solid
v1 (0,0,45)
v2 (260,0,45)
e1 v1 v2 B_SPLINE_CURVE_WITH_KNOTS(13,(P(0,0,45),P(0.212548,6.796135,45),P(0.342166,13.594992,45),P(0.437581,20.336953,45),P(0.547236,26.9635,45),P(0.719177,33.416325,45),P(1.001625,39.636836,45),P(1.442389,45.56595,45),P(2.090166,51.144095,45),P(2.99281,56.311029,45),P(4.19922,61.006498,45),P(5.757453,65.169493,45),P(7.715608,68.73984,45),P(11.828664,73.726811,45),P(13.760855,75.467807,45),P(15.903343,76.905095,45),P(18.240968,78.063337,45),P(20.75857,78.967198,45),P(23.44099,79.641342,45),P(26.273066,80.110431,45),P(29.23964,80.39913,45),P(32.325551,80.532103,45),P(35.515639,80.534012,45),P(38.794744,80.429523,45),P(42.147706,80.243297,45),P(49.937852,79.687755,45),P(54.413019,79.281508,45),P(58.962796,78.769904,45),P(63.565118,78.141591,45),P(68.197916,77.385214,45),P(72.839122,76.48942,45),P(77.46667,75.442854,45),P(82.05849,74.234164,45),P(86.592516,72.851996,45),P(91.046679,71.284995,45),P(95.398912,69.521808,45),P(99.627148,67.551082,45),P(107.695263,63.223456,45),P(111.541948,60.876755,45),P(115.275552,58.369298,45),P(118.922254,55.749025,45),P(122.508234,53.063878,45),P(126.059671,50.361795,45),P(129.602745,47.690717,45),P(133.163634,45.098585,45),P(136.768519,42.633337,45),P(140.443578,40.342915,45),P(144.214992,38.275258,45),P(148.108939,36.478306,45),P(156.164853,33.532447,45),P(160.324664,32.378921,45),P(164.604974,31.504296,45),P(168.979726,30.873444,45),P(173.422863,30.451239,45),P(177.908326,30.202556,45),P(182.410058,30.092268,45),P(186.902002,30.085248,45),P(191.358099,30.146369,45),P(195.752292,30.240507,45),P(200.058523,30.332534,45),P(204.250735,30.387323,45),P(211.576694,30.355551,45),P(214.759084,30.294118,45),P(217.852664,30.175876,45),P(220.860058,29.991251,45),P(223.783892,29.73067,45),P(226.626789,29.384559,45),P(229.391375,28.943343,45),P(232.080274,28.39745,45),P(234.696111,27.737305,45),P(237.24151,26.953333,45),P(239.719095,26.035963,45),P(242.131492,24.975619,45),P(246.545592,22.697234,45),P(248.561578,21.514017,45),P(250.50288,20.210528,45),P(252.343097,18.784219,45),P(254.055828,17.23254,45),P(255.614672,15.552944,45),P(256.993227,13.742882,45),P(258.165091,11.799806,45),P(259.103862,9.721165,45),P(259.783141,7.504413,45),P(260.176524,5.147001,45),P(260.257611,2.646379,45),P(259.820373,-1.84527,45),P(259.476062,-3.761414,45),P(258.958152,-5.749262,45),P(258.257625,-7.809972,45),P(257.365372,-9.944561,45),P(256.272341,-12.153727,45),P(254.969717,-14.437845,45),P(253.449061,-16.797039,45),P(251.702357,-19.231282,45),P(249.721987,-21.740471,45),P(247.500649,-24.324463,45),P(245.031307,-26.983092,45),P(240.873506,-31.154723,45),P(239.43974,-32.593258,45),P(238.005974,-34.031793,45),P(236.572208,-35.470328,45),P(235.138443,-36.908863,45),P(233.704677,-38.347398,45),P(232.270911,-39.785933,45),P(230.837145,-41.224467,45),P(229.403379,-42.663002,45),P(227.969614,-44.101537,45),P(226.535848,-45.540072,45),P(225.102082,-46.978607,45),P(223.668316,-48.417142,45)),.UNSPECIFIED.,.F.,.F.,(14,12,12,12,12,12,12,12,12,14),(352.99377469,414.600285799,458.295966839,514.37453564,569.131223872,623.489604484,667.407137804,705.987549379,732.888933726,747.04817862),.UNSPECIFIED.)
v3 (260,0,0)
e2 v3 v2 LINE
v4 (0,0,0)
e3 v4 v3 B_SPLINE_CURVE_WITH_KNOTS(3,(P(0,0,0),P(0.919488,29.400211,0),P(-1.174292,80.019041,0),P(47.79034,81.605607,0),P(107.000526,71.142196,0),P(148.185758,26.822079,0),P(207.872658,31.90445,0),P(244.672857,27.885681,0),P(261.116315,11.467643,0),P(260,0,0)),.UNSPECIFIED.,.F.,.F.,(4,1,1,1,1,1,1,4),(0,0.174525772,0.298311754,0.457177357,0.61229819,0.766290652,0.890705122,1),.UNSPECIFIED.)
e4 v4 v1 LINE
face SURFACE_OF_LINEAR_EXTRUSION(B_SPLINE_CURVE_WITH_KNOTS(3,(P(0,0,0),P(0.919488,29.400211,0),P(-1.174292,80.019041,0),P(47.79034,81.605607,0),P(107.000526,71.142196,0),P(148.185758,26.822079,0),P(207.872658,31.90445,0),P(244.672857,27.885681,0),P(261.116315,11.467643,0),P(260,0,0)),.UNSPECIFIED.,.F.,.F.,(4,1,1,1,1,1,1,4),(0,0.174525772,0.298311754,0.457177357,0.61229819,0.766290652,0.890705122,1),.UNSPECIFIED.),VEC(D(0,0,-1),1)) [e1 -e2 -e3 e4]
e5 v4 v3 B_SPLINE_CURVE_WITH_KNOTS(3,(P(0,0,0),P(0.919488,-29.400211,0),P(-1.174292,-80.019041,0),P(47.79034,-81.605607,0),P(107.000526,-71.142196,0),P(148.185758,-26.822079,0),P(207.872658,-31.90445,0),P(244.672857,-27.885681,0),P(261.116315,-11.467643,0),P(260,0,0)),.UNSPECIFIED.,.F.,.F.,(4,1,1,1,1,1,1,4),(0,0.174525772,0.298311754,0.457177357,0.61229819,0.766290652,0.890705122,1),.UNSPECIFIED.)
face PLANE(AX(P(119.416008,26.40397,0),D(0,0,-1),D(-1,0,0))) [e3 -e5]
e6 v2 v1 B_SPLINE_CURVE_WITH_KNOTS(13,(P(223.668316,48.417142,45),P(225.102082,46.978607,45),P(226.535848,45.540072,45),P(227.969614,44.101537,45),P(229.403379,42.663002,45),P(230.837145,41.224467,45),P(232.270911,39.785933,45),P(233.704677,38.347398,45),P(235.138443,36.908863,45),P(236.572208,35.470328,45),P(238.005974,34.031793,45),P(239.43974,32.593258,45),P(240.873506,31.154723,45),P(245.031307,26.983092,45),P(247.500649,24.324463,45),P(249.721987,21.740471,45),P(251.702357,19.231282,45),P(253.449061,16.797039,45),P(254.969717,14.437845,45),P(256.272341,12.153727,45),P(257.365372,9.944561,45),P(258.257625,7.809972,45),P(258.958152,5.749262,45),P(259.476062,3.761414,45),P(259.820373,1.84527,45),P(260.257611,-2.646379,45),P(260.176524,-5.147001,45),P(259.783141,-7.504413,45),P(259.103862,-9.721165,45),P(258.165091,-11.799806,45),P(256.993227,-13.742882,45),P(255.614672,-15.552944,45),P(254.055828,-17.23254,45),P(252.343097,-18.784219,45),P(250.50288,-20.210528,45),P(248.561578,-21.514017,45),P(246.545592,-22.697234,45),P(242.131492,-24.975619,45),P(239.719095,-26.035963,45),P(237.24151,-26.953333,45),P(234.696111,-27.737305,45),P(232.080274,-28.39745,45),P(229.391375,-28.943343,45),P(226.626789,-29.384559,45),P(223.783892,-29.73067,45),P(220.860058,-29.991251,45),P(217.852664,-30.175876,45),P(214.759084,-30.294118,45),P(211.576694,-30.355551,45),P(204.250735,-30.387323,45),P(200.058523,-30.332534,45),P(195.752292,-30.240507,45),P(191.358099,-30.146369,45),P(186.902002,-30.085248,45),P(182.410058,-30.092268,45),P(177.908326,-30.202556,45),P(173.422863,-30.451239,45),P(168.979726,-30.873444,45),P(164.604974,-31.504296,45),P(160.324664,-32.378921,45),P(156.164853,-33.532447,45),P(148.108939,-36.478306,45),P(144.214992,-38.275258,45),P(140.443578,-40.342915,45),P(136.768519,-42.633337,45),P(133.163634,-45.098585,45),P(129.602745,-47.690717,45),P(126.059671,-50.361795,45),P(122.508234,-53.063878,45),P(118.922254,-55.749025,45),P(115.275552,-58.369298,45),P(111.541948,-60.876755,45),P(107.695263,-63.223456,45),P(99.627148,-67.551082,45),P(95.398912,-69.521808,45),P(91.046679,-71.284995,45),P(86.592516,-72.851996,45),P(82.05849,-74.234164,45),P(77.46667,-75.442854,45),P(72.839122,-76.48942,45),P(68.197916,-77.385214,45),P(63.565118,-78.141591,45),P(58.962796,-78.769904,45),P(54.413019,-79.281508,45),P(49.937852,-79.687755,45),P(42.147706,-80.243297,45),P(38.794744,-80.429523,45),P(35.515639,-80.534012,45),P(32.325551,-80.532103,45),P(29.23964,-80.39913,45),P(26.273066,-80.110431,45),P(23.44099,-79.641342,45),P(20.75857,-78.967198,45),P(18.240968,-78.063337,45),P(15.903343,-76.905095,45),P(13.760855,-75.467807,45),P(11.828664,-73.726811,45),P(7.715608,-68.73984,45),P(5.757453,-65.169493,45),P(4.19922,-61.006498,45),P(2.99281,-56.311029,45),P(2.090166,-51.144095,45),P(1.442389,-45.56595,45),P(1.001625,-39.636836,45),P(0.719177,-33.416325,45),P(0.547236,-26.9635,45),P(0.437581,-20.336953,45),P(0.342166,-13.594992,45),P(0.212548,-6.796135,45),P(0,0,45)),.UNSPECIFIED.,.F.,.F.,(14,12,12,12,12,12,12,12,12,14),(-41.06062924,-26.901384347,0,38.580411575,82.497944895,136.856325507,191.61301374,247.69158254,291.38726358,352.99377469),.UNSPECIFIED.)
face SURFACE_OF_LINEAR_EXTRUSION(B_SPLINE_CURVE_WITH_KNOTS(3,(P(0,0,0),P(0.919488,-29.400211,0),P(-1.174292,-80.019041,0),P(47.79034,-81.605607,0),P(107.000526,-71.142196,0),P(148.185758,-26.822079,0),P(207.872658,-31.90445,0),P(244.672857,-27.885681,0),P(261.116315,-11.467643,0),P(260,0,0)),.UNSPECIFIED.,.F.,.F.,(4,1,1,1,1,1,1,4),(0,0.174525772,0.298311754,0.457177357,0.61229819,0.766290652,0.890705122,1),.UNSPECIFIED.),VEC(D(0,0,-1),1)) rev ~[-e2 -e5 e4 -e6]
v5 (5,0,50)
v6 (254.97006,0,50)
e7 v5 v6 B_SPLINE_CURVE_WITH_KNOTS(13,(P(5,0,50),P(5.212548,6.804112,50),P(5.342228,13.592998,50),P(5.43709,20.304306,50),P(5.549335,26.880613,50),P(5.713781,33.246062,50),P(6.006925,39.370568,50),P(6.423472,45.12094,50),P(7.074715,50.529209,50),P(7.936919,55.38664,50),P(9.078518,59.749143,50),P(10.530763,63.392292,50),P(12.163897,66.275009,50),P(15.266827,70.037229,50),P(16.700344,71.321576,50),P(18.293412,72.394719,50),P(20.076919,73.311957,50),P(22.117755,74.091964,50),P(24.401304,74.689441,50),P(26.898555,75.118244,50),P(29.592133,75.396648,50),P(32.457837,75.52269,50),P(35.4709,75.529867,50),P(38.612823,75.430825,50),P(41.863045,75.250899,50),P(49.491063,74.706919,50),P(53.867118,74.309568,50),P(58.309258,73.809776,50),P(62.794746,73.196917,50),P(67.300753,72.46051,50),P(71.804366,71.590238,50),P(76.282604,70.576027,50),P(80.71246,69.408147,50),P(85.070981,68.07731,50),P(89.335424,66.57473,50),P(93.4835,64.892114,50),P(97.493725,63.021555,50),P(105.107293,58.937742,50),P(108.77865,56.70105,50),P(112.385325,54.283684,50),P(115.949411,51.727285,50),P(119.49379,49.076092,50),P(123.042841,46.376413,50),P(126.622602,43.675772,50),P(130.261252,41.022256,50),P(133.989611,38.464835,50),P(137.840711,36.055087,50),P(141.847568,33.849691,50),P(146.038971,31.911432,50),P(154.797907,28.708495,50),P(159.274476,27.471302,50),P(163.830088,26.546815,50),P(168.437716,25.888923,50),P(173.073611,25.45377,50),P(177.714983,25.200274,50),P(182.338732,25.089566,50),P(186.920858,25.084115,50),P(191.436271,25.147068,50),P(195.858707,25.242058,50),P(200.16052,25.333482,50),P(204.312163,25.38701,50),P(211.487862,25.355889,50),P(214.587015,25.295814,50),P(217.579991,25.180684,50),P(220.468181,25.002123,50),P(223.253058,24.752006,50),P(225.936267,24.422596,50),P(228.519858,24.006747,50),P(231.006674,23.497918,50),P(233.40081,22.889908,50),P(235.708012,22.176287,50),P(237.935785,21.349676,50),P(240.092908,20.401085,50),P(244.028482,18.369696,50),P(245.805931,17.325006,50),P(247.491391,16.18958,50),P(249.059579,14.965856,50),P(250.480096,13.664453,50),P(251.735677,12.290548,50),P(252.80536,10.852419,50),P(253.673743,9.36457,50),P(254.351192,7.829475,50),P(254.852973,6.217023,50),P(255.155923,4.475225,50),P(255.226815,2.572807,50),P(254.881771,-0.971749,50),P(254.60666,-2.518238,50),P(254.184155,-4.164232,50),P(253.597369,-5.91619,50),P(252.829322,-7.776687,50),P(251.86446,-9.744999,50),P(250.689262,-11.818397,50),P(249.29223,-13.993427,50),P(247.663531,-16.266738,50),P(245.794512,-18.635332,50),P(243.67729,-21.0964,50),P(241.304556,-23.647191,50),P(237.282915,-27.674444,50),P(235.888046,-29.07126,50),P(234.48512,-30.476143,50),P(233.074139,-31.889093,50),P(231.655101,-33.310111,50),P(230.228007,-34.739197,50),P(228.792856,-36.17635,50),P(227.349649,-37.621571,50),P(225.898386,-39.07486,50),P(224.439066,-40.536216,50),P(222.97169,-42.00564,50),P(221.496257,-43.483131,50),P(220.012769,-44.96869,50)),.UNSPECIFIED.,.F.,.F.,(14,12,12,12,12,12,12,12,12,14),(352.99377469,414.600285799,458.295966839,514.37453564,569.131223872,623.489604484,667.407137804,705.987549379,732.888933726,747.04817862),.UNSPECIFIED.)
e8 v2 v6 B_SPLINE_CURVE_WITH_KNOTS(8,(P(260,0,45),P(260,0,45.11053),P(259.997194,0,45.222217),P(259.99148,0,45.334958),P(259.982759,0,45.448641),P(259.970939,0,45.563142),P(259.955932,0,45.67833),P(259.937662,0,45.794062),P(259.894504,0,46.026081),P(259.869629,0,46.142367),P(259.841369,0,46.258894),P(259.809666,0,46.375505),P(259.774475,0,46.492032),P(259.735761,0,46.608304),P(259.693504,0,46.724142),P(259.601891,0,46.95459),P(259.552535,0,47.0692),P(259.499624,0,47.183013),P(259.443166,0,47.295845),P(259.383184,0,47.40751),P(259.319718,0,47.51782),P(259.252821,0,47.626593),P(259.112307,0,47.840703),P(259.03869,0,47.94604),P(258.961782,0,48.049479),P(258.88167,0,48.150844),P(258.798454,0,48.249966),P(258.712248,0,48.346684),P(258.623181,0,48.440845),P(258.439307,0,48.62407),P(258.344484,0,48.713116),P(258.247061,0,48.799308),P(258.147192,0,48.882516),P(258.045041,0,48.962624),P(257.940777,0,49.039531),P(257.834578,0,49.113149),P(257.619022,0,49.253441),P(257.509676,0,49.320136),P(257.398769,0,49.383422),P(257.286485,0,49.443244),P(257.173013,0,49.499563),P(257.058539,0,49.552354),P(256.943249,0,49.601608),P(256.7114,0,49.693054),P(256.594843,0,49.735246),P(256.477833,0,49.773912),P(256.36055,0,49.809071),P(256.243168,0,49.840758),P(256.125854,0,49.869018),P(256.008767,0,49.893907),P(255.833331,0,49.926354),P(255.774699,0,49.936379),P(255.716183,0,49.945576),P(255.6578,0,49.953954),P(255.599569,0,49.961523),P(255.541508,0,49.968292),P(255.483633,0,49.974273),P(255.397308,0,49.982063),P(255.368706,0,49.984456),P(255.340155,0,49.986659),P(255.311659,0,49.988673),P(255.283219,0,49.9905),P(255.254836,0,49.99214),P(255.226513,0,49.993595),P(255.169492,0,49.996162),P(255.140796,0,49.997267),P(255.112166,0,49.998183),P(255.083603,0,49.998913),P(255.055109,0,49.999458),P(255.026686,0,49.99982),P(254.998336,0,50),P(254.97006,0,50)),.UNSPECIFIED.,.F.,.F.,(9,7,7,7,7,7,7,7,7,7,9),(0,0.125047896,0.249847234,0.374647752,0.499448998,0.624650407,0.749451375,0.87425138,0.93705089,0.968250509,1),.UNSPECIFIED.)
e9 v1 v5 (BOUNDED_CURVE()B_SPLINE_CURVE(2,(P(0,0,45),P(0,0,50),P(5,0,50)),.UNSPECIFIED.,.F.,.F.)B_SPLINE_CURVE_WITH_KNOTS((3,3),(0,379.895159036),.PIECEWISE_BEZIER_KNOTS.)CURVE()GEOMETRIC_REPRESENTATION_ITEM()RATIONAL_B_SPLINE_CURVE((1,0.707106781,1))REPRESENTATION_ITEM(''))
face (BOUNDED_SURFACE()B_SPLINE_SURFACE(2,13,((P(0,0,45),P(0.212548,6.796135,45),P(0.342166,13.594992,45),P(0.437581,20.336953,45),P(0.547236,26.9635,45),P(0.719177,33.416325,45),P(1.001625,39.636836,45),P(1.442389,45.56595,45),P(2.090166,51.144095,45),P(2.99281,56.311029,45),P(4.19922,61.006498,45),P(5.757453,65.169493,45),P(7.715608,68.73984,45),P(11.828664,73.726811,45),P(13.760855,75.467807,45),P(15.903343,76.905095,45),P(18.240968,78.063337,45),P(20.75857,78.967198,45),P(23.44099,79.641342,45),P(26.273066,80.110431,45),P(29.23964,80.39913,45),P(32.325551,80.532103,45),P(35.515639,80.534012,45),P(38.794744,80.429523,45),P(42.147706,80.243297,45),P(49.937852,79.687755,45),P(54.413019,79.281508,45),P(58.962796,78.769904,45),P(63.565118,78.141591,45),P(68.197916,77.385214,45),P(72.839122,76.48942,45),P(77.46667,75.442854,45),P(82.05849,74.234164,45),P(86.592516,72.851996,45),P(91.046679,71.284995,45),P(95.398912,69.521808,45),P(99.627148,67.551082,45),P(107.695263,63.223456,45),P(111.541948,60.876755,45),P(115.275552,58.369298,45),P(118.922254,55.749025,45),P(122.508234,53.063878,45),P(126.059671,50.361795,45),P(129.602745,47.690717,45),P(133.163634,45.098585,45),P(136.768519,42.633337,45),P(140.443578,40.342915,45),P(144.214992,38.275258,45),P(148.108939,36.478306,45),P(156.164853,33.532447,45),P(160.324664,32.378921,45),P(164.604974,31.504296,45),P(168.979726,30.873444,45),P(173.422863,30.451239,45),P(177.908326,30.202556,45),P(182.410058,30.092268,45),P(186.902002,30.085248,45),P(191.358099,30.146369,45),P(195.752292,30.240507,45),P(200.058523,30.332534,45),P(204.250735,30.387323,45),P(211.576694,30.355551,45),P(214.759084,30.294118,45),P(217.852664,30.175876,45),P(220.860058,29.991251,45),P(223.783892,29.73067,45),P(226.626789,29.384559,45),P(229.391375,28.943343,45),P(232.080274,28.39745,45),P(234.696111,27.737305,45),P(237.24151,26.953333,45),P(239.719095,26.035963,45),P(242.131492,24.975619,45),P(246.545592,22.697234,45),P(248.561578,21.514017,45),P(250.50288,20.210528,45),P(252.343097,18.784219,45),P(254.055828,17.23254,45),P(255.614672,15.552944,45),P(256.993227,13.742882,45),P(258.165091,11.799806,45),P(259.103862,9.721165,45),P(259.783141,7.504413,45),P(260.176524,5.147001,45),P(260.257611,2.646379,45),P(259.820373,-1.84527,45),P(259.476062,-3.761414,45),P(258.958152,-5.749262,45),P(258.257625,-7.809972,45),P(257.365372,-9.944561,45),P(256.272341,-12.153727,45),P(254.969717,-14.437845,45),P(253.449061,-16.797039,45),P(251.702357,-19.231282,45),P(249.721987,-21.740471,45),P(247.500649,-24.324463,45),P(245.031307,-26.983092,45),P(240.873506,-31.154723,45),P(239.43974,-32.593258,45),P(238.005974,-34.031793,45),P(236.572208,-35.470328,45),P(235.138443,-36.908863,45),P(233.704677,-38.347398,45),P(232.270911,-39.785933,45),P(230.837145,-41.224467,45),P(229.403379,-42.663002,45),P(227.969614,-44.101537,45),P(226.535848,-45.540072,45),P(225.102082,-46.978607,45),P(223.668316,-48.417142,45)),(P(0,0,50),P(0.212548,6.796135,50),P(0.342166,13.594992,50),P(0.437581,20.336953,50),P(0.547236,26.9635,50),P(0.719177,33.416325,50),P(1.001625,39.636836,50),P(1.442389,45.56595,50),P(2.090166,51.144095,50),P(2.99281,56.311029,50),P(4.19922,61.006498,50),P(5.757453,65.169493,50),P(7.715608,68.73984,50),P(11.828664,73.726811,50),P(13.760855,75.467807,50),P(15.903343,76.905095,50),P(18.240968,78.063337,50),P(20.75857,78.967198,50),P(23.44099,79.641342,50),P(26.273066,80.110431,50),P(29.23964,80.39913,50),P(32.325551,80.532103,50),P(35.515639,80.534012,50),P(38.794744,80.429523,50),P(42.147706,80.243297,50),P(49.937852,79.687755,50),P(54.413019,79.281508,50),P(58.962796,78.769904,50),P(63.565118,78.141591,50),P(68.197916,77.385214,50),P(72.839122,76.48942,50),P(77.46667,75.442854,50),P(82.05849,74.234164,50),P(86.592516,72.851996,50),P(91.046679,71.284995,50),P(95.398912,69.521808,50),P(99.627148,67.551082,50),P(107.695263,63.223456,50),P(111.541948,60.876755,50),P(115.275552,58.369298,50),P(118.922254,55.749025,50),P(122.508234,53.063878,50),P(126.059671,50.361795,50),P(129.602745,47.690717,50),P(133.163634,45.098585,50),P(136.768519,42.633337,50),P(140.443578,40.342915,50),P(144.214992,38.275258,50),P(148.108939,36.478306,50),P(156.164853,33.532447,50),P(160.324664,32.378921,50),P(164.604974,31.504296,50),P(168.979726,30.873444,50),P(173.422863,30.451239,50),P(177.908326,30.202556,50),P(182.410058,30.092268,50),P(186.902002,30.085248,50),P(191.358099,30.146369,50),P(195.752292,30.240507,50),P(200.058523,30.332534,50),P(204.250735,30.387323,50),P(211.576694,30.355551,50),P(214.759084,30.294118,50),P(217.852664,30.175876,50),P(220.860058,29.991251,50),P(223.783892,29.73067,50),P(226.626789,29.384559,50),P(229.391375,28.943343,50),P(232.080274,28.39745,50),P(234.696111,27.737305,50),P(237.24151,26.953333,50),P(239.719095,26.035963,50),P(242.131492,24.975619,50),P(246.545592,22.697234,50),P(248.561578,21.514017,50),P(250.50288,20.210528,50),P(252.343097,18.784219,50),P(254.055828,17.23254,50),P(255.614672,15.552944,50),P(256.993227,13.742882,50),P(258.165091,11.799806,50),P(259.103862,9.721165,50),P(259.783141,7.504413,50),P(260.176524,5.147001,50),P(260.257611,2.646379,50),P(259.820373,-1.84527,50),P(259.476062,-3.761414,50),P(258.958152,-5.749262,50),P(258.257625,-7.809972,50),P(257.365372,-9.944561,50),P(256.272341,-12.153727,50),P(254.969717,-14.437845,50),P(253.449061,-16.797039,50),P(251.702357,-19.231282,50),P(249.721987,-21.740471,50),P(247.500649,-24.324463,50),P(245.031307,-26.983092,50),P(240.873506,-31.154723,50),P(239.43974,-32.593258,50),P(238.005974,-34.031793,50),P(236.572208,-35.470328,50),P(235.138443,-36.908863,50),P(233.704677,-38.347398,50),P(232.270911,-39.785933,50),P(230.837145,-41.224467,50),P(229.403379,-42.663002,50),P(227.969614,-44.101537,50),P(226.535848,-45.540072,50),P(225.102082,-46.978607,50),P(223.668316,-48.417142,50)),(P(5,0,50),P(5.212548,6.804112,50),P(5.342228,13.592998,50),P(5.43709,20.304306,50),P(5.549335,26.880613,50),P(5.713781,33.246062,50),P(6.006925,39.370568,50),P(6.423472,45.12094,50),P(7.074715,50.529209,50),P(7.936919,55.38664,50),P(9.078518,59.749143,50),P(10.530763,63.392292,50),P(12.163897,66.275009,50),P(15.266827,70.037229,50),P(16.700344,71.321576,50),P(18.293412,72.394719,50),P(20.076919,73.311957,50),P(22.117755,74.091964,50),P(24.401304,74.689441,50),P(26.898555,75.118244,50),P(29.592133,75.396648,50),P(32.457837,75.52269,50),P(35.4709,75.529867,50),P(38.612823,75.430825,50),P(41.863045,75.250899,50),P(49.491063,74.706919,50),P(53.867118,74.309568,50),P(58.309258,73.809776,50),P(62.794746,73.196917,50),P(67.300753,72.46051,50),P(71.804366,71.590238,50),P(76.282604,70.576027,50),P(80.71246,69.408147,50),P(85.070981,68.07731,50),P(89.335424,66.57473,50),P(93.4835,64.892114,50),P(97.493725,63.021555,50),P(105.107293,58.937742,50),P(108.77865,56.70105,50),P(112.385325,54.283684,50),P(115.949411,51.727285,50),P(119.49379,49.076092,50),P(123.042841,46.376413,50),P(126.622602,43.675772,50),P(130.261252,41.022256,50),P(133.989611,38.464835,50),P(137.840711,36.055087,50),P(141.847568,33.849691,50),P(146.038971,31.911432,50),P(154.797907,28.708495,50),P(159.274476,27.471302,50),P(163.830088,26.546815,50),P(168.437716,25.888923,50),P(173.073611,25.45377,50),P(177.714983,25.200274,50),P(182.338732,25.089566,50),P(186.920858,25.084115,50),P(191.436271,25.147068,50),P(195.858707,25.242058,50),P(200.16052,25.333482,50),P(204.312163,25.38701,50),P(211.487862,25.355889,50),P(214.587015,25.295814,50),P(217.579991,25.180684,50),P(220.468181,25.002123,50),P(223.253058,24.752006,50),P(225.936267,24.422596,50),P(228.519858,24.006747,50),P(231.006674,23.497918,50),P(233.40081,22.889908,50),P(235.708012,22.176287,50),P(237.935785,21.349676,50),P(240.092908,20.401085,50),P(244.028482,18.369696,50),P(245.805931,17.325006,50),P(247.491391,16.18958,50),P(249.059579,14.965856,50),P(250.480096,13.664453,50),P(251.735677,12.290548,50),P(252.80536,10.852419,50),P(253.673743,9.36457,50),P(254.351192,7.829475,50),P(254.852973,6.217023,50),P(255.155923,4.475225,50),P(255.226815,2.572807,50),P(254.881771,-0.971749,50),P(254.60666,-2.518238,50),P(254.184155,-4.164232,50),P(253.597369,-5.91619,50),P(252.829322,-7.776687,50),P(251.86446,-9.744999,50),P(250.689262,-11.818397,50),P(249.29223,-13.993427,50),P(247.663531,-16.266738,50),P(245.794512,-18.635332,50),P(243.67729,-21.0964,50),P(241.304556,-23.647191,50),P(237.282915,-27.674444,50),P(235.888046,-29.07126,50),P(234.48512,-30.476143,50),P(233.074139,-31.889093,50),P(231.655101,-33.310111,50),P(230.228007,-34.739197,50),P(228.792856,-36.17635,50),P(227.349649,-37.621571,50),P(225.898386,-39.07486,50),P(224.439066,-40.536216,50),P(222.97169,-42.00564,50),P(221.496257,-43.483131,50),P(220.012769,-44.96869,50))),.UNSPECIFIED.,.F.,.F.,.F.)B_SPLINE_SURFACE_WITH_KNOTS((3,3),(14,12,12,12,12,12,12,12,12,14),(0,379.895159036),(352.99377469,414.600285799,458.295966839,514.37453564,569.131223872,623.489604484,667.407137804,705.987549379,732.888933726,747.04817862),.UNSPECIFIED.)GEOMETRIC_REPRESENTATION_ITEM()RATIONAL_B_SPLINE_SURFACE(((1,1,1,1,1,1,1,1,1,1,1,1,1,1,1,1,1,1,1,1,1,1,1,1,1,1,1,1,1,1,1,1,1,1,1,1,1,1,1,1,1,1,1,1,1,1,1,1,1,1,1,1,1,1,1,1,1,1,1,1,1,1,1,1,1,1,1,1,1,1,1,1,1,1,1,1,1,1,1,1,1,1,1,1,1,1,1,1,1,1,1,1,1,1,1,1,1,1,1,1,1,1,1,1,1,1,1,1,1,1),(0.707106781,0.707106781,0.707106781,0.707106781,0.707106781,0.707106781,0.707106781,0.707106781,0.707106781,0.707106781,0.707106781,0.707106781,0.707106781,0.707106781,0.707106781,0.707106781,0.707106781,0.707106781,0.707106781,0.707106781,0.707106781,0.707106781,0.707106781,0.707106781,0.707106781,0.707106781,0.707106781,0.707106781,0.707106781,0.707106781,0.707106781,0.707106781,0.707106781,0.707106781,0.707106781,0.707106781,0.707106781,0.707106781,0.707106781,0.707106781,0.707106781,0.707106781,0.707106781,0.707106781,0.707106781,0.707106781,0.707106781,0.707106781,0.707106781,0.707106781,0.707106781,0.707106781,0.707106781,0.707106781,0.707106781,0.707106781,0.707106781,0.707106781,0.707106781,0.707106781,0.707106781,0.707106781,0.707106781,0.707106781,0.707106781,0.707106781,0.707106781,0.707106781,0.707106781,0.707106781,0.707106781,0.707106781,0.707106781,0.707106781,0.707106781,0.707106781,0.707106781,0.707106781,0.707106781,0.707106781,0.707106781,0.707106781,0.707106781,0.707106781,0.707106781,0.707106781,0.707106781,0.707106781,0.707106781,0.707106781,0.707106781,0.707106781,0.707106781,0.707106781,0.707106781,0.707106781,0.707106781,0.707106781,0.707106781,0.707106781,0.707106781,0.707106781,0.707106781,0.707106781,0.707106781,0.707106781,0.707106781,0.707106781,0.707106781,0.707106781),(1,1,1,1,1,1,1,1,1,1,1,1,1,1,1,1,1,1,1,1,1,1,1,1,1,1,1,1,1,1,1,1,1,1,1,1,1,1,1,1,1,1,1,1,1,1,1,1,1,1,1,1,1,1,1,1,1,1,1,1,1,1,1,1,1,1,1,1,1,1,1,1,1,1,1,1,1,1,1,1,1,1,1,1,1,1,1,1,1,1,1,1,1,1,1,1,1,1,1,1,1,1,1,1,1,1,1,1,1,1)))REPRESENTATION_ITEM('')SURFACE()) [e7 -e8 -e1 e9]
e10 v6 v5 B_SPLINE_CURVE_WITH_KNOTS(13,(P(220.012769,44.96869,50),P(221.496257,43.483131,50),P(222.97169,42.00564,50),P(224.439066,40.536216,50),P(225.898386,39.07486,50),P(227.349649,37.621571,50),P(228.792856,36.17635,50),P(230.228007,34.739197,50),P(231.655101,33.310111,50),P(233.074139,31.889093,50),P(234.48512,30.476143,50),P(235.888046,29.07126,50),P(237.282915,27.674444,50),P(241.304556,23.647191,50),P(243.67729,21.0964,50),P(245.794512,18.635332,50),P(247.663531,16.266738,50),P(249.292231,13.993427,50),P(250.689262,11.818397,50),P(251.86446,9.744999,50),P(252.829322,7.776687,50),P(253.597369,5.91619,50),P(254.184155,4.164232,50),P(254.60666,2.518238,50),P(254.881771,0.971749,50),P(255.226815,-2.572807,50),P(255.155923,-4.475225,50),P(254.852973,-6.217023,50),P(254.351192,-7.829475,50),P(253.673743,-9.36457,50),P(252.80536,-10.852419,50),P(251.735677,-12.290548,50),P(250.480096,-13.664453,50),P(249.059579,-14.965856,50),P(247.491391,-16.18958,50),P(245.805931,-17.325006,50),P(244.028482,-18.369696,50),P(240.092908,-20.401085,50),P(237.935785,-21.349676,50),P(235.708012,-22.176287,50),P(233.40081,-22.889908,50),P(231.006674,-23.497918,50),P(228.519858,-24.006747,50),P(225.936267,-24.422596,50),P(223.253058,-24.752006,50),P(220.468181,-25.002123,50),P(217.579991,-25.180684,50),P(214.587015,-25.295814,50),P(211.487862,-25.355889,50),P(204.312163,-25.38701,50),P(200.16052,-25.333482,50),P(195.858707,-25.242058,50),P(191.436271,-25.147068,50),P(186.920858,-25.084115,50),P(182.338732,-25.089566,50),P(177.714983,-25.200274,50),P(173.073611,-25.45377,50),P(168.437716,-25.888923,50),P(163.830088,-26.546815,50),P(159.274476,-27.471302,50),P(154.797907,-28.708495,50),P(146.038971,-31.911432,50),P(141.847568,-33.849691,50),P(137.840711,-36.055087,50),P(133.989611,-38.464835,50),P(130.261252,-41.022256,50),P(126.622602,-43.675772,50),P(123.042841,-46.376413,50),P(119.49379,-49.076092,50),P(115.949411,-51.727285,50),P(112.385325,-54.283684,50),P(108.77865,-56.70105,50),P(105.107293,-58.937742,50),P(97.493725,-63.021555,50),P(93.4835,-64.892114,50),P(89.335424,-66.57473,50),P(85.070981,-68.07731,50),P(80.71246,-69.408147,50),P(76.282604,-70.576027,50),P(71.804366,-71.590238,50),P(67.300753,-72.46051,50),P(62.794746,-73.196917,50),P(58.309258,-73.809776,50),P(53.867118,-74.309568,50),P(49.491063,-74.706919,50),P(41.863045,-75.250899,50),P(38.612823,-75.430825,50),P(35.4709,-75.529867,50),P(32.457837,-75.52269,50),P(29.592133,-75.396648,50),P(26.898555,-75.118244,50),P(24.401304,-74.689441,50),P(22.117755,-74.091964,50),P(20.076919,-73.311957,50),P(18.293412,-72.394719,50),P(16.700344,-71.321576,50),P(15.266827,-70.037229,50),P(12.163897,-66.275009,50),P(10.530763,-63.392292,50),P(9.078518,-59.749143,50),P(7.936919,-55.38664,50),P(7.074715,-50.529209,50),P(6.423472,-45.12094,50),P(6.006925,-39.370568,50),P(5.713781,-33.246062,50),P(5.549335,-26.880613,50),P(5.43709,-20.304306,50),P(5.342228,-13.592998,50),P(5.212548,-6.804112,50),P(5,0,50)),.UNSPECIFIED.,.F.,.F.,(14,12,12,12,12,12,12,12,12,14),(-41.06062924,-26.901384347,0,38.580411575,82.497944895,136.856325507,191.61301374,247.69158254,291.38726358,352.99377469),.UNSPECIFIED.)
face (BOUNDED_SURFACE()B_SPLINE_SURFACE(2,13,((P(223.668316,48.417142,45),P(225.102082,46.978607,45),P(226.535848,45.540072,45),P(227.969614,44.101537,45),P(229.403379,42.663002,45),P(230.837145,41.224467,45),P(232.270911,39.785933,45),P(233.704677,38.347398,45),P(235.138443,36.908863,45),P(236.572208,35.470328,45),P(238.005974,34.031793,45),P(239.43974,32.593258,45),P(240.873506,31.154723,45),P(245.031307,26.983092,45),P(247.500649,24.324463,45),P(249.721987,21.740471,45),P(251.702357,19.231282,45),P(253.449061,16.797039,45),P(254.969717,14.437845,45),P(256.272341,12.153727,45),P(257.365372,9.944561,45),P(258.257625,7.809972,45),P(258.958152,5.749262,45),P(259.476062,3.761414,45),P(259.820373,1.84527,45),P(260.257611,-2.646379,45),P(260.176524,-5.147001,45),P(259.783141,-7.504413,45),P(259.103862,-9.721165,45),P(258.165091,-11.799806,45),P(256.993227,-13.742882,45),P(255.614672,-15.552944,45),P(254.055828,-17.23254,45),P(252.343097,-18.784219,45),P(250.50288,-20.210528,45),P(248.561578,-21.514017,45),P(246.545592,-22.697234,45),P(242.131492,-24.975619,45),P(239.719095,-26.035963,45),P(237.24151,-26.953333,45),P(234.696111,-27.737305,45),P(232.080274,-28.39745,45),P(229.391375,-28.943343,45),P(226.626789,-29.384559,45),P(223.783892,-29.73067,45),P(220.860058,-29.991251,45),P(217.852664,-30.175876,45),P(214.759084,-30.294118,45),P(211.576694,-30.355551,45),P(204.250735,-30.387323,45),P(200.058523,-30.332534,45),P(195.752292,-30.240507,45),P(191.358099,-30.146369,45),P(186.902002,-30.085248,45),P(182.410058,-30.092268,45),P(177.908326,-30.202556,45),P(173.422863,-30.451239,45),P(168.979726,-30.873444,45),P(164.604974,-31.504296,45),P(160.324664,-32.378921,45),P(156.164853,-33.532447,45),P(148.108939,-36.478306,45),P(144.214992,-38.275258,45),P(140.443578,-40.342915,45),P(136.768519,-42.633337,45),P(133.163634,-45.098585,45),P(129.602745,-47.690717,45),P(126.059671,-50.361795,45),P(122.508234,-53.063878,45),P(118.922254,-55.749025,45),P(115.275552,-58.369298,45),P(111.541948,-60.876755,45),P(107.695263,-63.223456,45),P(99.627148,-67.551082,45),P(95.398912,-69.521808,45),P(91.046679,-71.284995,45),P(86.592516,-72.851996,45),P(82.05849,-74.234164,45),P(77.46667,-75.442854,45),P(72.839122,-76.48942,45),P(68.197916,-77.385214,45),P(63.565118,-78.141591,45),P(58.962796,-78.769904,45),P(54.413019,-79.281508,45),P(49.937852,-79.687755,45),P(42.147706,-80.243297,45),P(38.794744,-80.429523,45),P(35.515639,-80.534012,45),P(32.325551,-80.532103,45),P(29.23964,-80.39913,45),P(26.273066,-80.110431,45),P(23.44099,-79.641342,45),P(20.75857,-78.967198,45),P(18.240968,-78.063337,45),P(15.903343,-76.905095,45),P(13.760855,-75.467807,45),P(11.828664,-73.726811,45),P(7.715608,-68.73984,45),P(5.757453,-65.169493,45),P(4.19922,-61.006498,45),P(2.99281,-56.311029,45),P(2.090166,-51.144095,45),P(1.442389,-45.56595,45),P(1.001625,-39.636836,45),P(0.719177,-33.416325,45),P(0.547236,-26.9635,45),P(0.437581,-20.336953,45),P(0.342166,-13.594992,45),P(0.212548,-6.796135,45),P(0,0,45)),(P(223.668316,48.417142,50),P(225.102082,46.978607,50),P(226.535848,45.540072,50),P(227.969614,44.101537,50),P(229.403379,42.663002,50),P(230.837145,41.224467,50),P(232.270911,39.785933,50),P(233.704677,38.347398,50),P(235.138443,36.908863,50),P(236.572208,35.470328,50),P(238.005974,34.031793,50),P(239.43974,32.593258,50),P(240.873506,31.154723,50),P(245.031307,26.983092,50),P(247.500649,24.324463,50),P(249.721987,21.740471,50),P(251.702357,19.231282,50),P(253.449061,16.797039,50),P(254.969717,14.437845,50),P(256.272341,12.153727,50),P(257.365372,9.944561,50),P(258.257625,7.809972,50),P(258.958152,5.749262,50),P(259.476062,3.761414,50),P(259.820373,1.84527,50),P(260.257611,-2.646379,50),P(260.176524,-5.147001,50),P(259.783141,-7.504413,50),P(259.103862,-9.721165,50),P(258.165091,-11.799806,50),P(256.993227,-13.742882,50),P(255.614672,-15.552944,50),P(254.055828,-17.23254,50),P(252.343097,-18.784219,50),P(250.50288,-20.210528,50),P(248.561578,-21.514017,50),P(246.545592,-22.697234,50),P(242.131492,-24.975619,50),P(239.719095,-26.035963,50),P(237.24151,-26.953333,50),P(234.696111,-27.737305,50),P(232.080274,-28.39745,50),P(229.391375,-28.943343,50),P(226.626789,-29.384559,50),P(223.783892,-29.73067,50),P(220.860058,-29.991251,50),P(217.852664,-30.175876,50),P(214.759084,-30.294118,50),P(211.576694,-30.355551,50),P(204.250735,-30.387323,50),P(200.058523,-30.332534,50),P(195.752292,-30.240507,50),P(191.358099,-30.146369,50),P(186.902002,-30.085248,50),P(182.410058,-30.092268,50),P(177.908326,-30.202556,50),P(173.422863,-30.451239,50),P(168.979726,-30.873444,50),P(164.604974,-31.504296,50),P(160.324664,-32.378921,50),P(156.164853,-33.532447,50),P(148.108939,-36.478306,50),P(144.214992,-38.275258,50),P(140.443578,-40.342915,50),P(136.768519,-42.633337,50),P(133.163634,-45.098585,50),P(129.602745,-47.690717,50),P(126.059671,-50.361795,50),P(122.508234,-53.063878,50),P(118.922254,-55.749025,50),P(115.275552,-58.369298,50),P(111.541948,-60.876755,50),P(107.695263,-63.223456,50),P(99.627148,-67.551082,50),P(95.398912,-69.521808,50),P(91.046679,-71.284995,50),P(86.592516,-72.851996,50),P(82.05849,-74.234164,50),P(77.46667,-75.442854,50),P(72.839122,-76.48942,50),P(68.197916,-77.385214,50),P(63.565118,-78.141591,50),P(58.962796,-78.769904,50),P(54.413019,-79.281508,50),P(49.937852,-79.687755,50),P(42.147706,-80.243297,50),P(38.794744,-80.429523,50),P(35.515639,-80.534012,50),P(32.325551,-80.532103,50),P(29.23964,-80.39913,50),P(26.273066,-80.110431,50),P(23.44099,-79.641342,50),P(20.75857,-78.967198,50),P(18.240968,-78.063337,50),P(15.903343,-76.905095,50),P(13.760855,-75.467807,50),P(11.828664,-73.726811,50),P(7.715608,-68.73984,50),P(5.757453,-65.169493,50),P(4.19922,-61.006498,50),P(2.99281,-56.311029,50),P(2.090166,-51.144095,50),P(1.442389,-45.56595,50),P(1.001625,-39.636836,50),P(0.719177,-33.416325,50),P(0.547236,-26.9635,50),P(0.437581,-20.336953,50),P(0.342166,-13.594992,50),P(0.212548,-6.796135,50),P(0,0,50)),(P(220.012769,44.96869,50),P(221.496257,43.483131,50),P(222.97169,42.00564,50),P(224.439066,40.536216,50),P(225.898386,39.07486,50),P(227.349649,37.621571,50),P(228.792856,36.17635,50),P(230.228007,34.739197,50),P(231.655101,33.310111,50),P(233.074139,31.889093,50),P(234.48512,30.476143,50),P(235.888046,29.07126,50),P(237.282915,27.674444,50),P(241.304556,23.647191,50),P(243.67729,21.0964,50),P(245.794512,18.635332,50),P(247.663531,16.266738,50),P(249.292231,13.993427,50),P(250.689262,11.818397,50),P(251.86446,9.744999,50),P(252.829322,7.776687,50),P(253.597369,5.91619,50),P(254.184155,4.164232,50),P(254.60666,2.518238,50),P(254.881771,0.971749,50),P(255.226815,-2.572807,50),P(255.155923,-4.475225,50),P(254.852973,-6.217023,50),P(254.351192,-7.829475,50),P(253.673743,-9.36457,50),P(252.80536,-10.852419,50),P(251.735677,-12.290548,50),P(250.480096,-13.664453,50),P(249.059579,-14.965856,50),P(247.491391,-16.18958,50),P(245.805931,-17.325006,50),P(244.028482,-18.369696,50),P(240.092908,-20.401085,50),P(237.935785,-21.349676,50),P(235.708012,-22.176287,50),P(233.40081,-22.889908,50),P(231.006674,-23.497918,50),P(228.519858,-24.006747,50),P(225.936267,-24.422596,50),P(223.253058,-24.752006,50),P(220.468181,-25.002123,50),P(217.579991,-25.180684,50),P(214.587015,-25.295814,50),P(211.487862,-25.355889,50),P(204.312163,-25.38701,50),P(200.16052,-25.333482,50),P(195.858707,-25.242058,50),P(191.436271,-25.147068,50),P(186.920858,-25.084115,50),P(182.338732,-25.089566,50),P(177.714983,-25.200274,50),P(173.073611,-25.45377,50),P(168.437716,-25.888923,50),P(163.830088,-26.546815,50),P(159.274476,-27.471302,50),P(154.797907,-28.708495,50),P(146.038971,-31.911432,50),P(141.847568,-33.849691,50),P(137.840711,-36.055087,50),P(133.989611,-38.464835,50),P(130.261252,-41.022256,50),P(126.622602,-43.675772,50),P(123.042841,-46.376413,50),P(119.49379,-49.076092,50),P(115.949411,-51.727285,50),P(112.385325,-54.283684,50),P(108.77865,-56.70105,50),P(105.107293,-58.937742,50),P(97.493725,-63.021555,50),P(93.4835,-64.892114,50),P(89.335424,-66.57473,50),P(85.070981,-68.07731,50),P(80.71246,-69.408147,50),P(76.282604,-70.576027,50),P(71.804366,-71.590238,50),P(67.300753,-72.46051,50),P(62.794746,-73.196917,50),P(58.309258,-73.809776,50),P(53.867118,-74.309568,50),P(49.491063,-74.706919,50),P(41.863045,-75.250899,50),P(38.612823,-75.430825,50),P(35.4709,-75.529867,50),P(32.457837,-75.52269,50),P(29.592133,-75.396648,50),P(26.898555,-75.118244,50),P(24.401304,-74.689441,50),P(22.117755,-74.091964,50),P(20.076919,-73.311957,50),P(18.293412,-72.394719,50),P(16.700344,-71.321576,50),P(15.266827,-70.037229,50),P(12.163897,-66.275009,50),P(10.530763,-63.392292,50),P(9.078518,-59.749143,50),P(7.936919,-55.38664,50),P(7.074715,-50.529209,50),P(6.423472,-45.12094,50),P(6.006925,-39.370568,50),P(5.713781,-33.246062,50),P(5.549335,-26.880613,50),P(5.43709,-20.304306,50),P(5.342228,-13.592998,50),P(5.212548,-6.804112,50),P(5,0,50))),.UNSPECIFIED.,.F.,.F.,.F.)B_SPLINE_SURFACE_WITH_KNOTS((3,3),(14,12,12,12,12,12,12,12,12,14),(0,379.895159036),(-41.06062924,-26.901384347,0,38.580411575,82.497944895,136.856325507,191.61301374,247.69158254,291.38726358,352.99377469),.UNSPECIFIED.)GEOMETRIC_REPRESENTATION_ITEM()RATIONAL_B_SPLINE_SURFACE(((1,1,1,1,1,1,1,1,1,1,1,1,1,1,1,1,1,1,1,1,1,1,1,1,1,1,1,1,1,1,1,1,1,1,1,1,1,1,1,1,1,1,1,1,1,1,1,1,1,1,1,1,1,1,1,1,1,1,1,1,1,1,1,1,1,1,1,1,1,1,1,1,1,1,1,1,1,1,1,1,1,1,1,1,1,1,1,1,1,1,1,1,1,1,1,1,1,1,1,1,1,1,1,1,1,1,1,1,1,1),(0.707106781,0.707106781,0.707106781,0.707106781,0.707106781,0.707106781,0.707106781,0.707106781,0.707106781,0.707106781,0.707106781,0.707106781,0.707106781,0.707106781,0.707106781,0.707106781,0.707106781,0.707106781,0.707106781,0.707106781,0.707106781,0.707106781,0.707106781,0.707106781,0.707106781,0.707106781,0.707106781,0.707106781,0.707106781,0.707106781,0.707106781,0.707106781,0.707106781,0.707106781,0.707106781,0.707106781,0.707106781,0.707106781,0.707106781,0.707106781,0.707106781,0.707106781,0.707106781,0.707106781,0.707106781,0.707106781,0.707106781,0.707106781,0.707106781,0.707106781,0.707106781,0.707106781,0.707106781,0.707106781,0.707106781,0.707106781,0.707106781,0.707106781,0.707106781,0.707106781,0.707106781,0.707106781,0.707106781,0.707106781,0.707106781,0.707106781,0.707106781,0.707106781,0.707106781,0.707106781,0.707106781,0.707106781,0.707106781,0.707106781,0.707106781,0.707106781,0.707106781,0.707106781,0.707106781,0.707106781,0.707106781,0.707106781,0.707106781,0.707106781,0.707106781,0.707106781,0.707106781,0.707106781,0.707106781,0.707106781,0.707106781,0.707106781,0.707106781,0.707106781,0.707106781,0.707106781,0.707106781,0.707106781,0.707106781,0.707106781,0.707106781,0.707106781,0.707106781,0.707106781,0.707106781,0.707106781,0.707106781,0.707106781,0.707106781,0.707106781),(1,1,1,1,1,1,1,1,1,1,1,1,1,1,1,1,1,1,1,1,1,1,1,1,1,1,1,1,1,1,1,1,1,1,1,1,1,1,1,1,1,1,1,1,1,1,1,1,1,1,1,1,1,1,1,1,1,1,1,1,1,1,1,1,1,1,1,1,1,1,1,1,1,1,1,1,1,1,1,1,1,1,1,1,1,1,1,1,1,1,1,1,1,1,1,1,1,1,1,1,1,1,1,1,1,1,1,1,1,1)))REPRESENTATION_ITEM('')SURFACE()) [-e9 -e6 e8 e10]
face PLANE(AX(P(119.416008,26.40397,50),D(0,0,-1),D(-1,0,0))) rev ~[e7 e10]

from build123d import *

# Parameters (mm, degrees)
F1_DEPTH = 50
F2_R     = 5


with BuildPart() as f1:
    # F0 (on Top) → F1 (new body)
    with BuildSketch(Plane.XY):
        with BuildLine():
            add(Edge.make_bspline(
                [(0, 0), (0.9194884541, 29.4002114479), (-1.1742920977, 80.0190413603), (47.790340102, 81.6056071987), (107.0005262857, 71.1421960021), (148.1857584102, 26.8220790626), (207.8726578314, 31.9044495279), (244.6728573572, 27.8856813881), (261.1163146223, 11.4676433787), (260, 0)],
                knots=[0, 0, 0, 0, 0.1745257722, 0.2983117542, 0.457177357, 0.6122981896, 0.7662906521, 0.8907051219, 1, 1, 1, 1], degree=3))
            Line((0, 0), (260, 0))
        make_face()
        with BuildLine():
            Line((260, 0), (0, 0))
            add(Edge.make_bspline(
                [(0, 0), (0.9194884541, -29.4002114479), (-1.1742920977, -80.0190413603), (47.790340102, -81.6056071987), (107.0005262857, -71.1421960021), (148.1857584102, -26.8220790626), (207.8726578314, -31.9044495279), (244.6728573572, -27.8856813881), (261.1163146223, -11.4676433787), (260, 0)],
                knots=[0, 0, 0, 0, 0.1745257722, 0.2983117542, 0.457177357, 0.6122981896, 0.7662906521, 0.8907051219, 1, 1, 1, 1], degree=3))
        make_face()
    extrude(amount=F1_DEPTH)

    # F2
    f2_edges = [f1.edges().sort_by_distance(p)[0] for p in [
        (107.976522, 62.92801, 50),
        (107.976522, -62.92801, 50),
    ]]
    fillet(f2_edges, radius=F2_R)


solid = f1.part
